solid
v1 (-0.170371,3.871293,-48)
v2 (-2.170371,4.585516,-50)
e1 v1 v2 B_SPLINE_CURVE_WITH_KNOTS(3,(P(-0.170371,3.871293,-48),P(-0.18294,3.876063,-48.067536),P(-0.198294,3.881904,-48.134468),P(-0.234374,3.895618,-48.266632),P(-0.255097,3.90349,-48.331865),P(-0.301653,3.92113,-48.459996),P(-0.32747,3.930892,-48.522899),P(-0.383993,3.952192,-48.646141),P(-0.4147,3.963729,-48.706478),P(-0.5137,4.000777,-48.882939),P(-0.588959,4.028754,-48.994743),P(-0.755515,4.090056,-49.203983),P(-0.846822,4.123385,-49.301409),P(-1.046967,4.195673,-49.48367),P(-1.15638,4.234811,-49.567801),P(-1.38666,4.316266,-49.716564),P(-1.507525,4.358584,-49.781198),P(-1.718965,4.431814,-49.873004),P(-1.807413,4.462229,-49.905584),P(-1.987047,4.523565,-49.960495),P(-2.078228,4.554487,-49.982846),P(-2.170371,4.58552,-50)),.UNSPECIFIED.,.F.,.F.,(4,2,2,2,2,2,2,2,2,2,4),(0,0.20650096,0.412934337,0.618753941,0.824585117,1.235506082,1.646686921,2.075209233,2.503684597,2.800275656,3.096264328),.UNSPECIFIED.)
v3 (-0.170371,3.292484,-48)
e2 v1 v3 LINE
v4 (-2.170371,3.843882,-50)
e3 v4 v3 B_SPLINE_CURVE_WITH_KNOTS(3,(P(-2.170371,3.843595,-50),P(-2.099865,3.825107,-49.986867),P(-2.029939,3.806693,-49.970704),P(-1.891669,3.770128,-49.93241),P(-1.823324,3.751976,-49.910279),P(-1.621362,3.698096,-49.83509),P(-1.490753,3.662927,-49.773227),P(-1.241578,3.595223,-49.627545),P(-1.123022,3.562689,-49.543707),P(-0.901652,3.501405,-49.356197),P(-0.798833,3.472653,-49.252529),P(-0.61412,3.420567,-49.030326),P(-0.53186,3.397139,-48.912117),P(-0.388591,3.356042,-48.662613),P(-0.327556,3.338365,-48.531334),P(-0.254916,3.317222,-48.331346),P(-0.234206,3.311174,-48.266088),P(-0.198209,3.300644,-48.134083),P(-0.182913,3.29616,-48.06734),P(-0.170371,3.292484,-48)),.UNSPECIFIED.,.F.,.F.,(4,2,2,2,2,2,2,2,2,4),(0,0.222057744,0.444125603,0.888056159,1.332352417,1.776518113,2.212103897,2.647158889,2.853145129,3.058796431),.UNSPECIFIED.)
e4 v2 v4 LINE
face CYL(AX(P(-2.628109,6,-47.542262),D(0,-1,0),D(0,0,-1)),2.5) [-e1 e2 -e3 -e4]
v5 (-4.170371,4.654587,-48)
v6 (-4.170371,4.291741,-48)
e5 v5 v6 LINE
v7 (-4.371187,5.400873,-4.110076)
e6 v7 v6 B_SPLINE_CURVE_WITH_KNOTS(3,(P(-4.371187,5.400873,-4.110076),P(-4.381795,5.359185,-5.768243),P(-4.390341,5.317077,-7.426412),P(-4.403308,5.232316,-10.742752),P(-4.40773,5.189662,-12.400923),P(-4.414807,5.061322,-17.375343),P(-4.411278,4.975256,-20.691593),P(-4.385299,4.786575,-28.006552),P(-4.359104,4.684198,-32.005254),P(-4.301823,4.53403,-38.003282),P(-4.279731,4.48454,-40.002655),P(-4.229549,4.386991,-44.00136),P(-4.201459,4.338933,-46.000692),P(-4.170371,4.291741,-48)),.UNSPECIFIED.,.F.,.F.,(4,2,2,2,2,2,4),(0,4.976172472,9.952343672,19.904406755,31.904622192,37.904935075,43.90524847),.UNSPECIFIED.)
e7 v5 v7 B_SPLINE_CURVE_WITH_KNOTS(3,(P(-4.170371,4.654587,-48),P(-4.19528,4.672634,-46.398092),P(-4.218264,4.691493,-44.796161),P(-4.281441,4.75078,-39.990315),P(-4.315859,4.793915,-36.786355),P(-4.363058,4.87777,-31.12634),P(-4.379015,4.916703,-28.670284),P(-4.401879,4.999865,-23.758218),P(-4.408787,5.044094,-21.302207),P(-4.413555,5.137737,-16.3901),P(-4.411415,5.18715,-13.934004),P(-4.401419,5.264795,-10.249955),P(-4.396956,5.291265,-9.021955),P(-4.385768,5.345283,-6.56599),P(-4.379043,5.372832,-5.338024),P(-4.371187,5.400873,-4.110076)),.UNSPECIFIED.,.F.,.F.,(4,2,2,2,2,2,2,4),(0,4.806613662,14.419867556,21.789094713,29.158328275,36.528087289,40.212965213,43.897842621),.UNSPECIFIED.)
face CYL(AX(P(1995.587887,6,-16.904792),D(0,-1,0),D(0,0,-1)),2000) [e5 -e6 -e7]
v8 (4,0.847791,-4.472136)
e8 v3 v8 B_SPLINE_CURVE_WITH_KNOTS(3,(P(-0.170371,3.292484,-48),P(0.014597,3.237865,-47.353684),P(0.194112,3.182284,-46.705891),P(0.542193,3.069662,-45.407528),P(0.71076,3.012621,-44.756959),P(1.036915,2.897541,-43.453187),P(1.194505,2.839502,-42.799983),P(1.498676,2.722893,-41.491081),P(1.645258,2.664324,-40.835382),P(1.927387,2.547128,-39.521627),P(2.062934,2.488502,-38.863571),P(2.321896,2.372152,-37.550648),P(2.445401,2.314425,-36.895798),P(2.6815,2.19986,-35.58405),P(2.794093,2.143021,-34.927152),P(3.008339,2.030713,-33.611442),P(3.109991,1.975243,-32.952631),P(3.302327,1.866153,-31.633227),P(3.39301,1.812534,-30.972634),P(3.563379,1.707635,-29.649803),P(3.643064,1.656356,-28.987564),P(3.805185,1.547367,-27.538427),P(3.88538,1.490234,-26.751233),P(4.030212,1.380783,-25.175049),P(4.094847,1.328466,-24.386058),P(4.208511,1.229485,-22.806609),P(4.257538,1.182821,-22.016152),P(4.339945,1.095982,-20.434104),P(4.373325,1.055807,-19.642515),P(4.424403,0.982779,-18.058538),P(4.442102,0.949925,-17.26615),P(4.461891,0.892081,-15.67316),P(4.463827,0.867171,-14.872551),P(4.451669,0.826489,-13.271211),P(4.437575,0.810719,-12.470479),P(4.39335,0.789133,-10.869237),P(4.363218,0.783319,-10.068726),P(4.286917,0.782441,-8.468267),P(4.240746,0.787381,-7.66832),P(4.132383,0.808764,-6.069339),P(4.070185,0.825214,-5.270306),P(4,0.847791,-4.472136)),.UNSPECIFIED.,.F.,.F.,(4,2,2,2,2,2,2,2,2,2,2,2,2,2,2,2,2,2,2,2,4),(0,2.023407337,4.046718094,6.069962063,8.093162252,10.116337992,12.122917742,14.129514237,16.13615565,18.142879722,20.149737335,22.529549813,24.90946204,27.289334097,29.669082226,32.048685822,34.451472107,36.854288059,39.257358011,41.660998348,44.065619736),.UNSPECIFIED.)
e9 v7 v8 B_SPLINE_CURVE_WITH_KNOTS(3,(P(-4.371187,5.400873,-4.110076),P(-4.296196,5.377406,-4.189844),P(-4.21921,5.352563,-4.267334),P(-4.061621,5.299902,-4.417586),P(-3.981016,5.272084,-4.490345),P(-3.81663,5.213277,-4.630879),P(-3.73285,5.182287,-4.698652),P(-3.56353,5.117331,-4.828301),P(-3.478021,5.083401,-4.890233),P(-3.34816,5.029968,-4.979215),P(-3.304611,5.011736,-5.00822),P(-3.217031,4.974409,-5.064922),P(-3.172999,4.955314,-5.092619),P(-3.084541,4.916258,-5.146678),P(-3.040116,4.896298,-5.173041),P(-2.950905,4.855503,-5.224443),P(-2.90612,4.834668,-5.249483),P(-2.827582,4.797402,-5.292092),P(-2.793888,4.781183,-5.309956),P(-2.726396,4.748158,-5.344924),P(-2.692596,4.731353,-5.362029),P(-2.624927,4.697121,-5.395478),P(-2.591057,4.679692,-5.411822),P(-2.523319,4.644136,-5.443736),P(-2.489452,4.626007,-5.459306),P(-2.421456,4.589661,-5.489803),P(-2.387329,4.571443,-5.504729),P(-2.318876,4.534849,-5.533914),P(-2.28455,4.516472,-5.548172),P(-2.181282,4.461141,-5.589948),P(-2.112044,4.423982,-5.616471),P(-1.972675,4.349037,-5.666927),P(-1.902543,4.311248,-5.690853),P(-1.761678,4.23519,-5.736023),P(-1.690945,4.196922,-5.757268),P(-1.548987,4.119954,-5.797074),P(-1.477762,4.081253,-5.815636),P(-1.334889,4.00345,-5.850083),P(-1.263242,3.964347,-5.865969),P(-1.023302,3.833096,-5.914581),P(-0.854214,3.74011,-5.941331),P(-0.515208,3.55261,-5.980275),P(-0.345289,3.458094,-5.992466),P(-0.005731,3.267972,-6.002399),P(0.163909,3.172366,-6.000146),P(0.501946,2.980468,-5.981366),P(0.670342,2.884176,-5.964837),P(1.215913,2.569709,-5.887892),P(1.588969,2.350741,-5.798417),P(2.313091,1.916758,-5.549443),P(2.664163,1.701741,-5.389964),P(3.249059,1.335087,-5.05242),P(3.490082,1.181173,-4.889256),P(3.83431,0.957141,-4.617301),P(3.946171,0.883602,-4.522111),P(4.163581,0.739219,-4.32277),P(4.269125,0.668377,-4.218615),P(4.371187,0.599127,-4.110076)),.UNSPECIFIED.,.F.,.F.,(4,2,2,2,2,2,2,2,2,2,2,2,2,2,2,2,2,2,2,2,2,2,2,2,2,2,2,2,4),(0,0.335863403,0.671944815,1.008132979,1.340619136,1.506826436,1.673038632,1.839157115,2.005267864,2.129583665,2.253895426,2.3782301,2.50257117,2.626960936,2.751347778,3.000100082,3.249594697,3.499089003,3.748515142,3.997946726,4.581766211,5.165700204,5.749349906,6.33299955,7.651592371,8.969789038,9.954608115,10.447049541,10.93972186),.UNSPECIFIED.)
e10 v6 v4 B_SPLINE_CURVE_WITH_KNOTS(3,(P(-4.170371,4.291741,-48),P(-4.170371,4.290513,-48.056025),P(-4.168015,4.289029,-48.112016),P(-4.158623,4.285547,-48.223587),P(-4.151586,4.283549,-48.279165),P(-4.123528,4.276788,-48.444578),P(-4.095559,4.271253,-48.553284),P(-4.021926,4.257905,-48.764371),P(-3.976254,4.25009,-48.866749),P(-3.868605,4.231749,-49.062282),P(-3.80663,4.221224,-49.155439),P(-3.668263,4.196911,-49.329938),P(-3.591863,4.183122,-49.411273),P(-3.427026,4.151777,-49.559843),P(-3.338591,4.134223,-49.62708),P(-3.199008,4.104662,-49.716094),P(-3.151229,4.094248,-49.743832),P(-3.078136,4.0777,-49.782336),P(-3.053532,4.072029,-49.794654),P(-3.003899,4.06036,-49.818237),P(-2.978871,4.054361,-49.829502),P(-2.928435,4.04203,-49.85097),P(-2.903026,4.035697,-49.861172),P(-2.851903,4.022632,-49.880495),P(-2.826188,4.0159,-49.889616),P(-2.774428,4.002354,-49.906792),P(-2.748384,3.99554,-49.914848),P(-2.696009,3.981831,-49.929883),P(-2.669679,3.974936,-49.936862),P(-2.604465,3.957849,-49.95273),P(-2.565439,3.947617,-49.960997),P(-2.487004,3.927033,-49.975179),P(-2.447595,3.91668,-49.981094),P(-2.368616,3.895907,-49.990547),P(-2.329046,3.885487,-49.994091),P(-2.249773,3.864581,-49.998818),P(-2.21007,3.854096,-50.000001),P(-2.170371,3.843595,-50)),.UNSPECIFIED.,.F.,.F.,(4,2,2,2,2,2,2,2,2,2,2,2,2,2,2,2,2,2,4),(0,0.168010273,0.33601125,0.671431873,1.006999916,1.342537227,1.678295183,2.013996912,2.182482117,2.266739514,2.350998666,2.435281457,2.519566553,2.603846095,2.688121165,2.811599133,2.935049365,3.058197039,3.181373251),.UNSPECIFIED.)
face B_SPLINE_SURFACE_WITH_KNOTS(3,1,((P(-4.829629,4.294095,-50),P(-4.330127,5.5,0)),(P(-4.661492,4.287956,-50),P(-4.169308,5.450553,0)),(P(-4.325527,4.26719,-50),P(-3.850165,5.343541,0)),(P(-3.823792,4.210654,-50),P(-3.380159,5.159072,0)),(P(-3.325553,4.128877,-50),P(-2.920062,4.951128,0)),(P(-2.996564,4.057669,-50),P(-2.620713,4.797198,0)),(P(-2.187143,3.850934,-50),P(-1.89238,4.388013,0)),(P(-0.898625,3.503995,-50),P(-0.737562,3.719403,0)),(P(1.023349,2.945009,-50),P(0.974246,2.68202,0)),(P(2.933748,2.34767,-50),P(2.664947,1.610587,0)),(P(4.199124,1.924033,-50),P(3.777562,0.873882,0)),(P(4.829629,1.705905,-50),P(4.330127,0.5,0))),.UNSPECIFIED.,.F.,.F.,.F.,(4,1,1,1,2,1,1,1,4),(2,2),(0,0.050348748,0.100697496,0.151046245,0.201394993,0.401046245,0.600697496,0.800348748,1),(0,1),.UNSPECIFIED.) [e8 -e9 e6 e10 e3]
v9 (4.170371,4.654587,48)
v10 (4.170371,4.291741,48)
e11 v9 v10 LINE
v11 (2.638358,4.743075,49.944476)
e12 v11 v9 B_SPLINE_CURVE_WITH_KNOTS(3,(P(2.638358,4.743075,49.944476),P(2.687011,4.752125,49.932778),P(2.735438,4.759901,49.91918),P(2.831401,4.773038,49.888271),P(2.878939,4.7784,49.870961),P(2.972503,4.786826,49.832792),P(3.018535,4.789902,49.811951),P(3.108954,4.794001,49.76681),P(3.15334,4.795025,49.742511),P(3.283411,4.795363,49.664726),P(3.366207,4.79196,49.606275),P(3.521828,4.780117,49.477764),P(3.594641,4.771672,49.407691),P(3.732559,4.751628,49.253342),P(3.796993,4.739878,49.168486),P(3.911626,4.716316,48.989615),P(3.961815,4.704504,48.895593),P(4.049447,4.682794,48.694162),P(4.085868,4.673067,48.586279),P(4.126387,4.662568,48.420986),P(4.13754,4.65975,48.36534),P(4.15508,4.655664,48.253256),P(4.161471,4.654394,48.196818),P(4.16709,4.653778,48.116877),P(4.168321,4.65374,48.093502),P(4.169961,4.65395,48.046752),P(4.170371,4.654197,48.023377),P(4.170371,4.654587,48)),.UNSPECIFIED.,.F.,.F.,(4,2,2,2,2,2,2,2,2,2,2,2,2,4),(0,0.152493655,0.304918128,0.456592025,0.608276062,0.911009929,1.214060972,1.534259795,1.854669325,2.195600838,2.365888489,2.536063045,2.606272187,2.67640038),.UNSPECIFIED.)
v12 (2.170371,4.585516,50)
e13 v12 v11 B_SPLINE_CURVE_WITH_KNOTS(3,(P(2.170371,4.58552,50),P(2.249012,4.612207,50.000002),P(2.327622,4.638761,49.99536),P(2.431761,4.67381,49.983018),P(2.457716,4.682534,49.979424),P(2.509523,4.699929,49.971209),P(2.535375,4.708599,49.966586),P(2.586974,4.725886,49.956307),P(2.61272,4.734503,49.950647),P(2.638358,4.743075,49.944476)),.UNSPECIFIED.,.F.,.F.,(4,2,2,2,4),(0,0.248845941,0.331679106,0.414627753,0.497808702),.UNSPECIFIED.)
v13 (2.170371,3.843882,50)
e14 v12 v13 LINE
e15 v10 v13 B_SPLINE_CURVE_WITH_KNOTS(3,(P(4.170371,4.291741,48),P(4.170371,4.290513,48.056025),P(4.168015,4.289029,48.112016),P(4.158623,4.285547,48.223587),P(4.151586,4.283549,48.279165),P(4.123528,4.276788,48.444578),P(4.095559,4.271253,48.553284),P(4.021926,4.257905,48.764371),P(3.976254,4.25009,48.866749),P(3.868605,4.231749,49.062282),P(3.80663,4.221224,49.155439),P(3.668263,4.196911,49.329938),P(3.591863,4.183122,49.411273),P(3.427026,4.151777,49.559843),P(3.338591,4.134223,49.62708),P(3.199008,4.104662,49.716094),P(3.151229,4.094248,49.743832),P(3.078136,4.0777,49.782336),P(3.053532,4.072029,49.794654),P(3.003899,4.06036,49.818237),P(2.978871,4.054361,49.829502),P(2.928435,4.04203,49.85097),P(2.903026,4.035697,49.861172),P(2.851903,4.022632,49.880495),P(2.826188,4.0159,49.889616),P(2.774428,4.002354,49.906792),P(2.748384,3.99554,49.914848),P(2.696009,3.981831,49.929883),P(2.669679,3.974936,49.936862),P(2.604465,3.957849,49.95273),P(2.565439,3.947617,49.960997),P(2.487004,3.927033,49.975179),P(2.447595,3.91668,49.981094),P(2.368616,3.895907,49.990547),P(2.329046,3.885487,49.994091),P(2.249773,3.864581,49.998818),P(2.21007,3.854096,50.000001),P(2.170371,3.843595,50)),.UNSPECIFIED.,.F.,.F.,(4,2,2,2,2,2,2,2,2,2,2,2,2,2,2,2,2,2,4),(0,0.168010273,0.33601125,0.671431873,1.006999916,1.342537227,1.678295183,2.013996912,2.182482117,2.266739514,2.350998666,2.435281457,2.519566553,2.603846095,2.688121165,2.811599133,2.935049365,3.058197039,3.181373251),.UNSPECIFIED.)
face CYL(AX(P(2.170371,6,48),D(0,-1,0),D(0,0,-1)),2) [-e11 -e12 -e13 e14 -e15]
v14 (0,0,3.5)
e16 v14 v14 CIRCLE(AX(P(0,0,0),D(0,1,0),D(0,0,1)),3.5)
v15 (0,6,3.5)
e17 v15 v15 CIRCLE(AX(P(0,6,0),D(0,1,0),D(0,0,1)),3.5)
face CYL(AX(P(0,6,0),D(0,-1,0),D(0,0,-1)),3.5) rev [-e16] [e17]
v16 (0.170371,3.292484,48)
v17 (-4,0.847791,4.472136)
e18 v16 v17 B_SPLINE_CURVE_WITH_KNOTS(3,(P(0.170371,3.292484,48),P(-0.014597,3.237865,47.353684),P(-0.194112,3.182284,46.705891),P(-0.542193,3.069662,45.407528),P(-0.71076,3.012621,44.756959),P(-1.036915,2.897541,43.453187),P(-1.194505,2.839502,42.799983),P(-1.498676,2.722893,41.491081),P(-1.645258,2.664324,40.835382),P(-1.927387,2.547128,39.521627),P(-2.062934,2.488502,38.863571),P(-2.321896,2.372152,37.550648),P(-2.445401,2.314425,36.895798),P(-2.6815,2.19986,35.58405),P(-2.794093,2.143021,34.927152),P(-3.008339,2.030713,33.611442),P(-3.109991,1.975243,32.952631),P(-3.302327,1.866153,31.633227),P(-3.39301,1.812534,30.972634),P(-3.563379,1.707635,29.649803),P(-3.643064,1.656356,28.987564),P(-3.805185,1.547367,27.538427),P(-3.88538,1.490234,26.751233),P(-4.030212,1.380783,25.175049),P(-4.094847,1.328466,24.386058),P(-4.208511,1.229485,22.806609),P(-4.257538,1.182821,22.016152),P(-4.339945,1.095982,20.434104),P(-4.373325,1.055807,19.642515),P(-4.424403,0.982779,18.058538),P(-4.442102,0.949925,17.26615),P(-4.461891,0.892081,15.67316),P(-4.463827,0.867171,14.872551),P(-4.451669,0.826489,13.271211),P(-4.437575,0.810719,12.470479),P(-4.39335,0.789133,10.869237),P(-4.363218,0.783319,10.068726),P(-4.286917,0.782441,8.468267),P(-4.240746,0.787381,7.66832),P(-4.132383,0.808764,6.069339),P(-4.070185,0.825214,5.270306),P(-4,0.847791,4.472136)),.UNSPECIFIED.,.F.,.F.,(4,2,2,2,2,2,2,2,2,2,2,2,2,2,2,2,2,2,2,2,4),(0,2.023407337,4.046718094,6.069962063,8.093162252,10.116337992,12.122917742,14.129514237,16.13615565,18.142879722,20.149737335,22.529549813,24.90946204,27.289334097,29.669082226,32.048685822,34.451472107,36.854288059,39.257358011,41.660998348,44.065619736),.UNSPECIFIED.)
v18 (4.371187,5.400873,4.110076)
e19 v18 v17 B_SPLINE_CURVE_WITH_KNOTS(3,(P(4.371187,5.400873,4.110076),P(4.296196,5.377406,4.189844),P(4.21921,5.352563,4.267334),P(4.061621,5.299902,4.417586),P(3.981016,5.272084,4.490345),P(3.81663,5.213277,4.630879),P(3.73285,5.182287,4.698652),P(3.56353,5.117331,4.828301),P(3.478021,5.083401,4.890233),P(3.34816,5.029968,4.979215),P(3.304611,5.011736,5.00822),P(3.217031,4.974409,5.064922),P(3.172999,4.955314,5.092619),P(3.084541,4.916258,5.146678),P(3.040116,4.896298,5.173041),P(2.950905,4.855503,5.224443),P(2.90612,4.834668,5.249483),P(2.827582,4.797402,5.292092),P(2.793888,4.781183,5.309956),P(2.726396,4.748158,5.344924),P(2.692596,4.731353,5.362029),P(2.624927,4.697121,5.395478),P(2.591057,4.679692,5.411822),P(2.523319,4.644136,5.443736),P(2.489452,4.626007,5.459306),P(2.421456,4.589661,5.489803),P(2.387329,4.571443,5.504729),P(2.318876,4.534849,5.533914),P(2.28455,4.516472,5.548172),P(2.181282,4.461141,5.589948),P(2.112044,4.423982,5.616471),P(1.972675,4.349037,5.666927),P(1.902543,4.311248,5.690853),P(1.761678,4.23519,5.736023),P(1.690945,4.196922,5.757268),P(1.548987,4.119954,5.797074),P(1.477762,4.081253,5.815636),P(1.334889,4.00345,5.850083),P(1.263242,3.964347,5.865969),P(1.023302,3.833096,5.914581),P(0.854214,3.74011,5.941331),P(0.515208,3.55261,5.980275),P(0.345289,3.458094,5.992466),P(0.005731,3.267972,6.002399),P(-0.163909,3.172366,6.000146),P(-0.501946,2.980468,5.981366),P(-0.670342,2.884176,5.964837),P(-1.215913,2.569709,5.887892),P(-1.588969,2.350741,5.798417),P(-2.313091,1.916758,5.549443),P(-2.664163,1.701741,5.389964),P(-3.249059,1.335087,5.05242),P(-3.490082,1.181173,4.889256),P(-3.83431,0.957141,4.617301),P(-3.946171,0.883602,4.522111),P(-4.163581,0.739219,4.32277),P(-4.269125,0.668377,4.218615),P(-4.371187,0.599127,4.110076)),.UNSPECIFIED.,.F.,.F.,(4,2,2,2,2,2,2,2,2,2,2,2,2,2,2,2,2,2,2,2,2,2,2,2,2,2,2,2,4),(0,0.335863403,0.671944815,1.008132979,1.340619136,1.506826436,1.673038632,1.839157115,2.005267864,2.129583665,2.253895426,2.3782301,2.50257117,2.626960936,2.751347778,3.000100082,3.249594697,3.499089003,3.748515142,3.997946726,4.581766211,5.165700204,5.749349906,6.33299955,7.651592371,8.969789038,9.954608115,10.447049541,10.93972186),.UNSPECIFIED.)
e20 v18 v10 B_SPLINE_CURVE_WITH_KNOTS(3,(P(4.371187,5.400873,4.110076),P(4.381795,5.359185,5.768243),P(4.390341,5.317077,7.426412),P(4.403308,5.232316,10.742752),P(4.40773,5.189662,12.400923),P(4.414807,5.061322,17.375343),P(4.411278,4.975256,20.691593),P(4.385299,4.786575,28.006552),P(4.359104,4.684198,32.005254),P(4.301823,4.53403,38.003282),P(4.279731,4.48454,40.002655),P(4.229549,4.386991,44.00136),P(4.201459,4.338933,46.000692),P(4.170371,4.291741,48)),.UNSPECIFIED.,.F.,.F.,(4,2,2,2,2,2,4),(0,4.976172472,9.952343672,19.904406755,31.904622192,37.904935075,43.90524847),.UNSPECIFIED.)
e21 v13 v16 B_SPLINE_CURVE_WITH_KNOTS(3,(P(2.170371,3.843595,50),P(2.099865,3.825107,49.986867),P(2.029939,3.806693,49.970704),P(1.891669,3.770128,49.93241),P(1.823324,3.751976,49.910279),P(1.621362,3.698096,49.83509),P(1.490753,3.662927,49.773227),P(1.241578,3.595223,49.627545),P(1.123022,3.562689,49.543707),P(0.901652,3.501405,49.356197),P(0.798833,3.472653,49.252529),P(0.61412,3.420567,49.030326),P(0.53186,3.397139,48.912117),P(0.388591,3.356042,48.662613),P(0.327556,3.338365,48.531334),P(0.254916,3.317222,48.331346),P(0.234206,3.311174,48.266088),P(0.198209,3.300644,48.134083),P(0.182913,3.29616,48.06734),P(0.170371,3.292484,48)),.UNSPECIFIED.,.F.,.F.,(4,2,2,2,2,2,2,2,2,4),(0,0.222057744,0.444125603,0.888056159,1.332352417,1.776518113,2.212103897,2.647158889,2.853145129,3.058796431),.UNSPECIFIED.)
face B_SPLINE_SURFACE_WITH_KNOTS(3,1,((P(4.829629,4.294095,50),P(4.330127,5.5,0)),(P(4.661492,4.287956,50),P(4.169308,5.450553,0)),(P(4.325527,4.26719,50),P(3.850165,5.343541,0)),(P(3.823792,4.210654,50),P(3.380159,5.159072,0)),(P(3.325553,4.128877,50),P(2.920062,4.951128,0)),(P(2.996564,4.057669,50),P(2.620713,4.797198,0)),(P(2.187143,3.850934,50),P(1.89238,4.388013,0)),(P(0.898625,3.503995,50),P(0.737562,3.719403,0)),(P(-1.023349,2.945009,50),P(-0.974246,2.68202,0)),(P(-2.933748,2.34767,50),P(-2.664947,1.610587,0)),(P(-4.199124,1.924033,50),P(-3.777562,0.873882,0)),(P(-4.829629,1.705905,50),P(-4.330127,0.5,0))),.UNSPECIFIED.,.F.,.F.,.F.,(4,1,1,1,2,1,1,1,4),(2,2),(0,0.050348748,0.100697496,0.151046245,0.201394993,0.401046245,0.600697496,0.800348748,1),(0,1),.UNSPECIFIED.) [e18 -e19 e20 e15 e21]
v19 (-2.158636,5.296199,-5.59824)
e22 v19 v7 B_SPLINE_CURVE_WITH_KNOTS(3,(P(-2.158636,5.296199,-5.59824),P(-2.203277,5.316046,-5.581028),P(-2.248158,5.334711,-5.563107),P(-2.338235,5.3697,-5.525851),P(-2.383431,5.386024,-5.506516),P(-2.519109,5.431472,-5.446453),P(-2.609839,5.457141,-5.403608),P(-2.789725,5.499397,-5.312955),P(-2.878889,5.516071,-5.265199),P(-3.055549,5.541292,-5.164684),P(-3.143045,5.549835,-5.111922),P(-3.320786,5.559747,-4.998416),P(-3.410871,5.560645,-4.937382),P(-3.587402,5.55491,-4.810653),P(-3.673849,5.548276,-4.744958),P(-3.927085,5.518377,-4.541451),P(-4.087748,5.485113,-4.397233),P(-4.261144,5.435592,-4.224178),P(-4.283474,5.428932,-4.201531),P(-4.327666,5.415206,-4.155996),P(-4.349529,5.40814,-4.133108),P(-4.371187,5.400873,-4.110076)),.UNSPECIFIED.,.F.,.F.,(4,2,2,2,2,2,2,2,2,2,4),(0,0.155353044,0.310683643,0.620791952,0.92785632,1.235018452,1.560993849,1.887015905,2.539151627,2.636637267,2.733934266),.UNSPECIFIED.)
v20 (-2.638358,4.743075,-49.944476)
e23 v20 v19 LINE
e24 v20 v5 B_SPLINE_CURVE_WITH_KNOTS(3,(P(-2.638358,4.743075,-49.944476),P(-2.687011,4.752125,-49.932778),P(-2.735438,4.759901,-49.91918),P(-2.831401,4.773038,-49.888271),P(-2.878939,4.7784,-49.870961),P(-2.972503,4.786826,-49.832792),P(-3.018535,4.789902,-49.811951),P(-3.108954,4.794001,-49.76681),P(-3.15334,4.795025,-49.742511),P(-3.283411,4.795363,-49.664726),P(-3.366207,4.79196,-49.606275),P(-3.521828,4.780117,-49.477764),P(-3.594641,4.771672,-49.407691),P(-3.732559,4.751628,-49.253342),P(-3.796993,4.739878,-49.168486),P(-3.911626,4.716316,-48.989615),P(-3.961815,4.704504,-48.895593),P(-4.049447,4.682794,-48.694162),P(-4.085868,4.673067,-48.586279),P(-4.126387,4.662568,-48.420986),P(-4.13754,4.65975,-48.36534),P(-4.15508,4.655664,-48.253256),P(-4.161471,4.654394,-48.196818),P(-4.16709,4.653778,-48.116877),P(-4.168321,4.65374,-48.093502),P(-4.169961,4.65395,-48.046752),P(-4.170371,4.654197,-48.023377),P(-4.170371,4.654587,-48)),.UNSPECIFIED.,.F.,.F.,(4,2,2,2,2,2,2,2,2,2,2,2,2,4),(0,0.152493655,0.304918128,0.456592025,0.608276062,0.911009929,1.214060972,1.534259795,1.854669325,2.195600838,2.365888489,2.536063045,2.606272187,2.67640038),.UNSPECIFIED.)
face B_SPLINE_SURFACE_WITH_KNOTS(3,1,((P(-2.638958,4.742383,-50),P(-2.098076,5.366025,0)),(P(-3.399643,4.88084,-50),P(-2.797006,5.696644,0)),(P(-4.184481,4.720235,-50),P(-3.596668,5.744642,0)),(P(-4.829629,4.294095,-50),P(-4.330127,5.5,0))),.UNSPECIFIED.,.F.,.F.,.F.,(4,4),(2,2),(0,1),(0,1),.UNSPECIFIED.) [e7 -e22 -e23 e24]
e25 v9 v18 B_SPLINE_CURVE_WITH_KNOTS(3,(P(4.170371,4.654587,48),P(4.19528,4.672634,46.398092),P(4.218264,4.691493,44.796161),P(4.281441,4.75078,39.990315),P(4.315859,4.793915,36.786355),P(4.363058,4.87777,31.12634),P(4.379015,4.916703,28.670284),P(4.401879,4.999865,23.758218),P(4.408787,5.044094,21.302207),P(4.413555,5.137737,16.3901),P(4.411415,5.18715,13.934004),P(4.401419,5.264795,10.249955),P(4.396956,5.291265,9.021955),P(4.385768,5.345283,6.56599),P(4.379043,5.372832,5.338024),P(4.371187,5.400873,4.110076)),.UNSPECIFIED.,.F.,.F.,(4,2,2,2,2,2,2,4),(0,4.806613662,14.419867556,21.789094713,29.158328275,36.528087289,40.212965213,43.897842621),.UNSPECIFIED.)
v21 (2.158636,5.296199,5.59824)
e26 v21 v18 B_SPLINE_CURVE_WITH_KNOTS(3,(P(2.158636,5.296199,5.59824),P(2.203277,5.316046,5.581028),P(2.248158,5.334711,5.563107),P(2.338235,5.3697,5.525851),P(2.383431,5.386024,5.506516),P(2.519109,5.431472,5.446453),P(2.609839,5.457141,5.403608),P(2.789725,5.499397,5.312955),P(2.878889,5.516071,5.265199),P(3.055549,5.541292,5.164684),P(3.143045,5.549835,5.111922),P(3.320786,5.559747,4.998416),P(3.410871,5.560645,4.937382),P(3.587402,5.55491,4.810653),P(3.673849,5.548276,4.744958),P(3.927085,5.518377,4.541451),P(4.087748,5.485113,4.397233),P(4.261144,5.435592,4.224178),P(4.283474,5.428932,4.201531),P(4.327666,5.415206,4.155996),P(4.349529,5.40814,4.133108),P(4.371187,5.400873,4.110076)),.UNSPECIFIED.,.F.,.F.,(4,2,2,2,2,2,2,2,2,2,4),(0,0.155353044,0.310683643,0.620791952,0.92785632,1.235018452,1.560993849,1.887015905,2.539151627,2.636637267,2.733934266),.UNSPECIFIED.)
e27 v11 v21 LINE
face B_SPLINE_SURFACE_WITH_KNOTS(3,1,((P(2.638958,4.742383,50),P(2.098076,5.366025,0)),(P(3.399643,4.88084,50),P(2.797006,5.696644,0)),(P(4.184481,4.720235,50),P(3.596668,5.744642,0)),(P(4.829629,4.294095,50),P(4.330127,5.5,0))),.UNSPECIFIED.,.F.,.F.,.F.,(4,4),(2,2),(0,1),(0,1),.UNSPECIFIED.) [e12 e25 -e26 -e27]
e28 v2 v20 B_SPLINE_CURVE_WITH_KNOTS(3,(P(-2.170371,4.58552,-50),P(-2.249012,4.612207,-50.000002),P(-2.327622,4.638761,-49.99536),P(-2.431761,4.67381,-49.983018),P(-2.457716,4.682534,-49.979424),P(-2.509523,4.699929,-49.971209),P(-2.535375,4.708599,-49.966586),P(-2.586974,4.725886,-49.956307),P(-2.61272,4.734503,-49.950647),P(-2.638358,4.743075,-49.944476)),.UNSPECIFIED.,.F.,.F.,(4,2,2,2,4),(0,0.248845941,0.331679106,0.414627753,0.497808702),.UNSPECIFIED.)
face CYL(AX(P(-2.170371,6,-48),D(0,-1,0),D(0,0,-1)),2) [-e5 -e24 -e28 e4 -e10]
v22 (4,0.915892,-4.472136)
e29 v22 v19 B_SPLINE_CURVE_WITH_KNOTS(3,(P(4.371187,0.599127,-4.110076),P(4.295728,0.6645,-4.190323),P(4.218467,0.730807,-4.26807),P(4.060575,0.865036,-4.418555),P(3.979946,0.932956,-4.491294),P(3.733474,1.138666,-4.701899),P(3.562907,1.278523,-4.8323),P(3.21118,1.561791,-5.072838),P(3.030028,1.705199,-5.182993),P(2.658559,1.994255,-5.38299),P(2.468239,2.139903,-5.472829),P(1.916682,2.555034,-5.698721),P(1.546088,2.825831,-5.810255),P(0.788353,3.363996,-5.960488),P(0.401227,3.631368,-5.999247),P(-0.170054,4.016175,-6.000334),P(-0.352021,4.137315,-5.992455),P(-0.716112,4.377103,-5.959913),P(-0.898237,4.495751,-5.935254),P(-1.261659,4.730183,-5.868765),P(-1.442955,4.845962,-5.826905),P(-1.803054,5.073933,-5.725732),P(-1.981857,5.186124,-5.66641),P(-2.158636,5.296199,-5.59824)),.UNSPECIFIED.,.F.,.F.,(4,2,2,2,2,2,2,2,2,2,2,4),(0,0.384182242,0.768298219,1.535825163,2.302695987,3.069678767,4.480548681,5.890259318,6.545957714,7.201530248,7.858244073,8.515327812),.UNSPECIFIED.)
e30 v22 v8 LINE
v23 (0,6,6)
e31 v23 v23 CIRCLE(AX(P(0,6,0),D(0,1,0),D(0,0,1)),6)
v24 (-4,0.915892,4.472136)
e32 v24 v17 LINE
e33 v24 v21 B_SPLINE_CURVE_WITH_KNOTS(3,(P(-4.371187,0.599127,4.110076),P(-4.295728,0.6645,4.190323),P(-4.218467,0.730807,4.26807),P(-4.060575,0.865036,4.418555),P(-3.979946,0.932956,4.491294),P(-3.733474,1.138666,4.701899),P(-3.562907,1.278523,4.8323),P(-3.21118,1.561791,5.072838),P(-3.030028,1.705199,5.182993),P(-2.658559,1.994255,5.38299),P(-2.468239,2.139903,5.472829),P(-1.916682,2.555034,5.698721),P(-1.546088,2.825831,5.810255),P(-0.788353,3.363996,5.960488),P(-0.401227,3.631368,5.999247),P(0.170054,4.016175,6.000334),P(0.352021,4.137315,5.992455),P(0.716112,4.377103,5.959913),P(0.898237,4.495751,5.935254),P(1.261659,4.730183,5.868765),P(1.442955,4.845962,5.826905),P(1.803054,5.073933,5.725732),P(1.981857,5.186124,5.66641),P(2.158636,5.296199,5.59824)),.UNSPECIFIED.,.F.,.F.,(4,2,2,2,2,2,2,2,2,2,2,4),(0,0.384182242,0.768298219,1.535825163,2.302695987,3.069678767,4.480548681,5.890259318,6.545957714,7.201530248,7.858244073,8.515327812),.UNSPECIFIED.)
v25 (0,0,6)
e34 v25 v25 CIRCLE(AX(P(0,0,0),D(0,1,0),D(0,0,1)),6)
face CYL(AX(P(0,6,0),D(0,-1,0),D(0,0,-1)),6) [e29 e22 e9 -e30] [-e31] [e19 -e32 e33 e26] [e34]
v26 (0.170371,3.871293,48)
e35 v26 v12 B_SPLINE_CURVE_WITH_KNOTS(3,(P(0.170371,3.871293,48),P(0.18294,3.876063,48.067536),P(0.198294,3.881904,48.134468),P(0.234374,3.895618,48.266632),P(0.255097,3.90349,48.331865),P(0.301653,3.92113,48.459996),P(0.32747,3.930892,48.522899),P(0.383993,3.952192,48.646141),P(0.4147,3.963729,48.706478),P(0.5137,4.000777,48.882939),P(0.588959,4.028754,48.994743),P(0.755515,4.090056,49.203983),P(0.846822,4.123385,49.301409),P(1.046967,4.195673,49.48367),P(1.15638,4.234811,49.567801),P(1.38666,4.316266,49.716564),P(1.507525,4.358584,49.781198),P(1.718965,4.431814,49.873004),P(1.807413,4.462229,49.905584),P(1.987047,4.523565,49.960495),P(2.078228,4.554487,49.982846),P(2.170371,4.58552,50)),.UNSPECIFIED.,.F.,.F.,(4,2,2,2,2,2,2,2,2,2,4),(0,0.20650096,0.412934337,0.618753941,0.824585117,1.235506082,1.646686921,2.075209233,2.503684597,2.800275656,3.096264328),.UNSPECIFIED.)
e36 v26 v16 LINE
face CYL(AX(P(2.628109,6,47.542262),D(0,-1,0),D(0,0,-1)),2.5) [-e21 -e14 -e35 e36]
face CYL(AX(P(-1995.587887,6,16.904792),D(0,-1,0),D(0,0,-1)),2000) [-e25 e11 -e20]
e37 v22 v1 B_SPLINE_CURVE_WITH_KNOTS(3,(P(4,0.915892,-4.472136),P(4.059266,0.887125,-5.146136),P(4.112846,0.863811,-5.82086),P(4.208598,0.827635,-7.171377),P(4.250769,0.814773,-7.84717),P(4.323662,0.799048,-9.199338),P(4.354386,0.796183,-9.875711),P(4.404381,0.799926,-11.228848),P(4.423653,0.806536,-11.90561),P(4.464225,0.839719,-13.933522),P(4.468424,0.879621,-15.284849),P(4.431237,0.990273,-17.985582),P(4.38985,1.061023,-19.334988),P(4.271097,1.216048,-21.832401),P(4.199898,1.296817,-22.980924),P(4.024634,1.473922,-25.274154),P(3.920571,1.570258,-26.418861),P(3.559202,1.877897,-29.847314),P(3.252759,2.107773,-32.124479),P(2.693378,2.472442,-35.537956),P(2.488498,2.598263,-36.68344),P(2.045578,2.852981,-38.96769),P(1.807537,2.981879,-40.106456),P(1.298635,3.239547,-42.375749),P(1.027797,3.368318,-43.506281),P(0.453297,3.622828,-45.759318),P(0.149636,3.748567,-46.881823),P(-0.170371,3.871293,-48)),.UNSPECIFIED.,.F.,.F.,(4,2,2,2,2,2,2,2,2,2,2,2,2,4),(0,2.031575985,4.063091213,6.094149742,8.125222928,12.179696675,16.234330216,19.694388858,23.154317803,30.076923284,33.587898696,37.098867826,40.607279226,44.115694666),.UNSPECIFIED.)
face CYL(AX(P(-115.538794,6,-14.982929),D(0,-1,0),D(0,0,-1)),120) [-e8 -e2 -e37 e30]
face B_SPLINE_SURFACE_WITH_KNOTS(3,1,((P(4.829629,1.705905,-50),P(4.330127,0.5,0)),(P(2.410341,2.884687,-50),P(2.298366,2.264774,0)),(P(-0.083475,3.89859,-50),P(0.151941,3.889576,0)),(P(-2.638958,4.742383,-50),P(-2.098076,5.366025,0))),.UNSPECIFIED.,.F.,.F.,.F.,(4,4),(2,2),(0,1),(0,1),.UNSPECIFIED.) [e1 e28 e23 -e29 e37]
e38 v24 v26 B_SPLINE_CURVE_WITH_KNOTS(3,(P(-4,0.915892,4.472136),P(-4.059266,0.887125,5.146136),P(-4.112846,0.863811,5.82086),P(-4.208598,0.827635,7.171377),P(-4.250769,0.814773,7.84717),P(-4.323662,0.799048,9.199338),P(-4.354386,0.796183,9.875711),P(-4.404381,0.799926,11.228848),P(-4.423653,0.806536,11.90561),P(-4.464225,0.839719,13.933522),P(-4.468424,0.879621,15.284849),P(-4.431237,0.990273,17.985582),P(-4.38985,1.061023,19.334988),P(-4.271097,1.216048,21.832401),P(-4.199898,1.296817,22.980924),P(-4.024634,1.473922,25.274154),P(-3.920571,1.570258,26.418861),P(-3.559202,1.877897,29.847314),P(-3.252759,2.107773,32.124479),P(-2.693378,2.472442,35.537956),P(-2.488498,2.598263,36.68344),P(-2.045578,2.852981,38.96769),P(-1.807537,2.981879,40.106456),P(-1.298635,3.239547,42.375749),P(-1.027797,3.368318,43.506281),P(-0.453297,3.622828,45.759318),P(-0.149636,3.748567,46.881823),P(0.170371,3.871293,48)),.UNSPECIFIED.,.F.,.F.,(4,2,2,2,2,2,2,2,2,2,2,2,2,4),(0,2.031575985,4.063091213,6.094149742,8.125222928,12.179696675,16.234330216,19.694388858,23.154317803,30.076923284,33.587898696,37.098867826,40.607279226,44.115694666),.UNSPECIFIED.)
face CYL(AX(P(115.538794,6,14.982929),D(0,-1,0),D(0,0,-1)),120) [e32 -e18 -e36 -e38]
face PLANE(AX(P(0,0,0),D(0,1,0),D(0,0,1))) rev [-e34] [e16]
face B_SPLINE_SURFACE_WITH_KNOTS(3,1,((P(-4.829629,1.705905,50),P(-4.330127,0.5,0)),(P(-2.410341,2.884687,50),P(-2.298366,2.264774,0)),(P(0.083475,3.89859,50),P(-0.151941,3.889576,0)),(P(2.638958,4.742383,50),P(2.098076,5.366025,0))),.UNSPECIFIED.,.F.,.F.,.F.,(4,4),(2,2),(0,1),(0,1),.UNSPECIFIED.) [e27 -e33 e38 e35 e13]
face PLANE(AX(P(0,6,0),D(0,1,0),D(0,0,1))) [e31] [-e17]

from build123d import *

# Parameters (mm, degrees)
SKETCH_1_R               = 6
SKETCH_1_R_2             = 3.5
EXTRUDE_1_DEPTH          = 6
CUT_EXTRUDE_1_DEPTH      = 51.714889455
PATTERN_CIRCULAR_1_COUNT = 2
SKETCH_6_R               = 3.500000001
CUT_EXTRUDE_2_DEPTH      = 51.714889443


with BuildPart() as part:
    # 草图1 → 凸台-拉伸1 (new body)
    with BuildSketch(Plane(origin=(0, 0, 0), x_dir=(1, 0, 0), z_dir=(0, 1, 0))):
        with Locations(Location((0, 0, 0), (0, 0, 270))):
            Circle(SKETCH_1_R)
        with Locations(Location((0, 0, 0), (0, 0, 270))):
            Circle(SKETCH_1_R_2, mode=Mode.SUBTRACT)
    extrude(amount=EXTRUDE_1_DEPTH)

    # 放样1: read off the stored shape, not the designer's step
    # 放样1: loft between two sections, ruled curve by curve
    loft_1_from = [
        Edge.make_bspline([(4.829629131, 4.294095226, 50), (4.661491838, 4.287956363, 50), (4.325526719, 4.26719033, 50), (3.823791731, 4.210654383, 50), (3.325552775, 4.128877425, 50), (2.996563694, 4.057669381, 50), (2.187142745, 3.850933665, 50), (0.89862524, 3.503994998, 50), (-1.023348969, 2.94500881, 50), (-2.933748014, 2.347669617, 50), (-4.199124361, 1.92403297, 50), (-4.829629131, 1.705904774, 50)], [0, 0, 0, 0, 0.050348748, 0.100697496, 0.151046245, 0.201394993, 0.201394993, 0.401046245, 0.600697496, 0.800348748, 1, 1, 1, 1], 3),
        Edge.make_bspline([(2.638958434, 4.742382962, 50), (3.399643135, 4.880839784, 50), (4.184480539, 4.72023464, 50), (4.829629131, 4.294095226, 50)], [0, 0, 0, 0, 1, 1, 1, 1], 3),
        Edge.make_bspline([(-4.829629131, 1.705904774, 50), (-2.410341267, 2.884687308, 50), (0.08347511, 3.898589732, 50), (2.638958434, 4.742382962, 50)], [0, 0, 0, 0, 1, 1, 1, 1], 3),
    ]
    loft_1_to = [
        Edge.make_bspline([(4.330127019, 5.5, 0), (4.16930772, 5.450553181, 0), (3.850164979, 5.343540561, 0), (3.380158776, 5.15907246, 0), (2.920062334, 4.951128253, 0), (2.620713283, 4.797197925, 0), (1.892379824, 4.388013, 0), (0.737561824, 3.719403112, 0), (-0.974246431, 2.682020387, 0), (-2.664947447, 1.610587376, 0), (-3.777561909, 0.873882301, 0), (-4.330127019, 0.5, 0)], [0, 0, 0, 0, 0.050348748, 0.100697496, 0.151046245, 0.201394993, 0.201394993, 0.401046245, 0.600697496, 0.800348748, 1, 1, 1, 1], 3),
        Edge.make_bspline([(2.098076211, 5.366025404, 0), (2.797005947, 5.696644113, 0), (3.596668336, 5.744642324, 0), (4.330127019, 5.5, 0)], [0, 0, 0, 0, 1, 1, 1, 1], 3),
        Edge.make_bspline([(-4.330127019, 0.5, 0), (-2.298365759, 2.264774268, 0), (-0.151941372, 3.889575977, 0), (2.098076211, 5.366025404, 0)], [0, 0, 0, 0, 1, 1, 1, 1], 3),
    ]
    loft_1 = Solid(Shell([*[Face.make_surface_from_curves(loft_1_from[k], loft_1_to[k]) for k in range(3)], Face(Wire(loft_1_from)), Face(Wire(loft_1_to))]))
    add(loft_1)

    # Loft 1 2: loft between two sections, ruled curve by curve
    loft_1_2_from = [
        Edge.make_bspline([(4.829629131, 4.294095226, 50), (4.661491838, 4.287956363, 50), (4.325526719, 4.26719033, 50), (3.823791731, 4.210654383, 50), (3.325552775, 4.128877425, 50), (2.996563694, 4.057669381, 50), (2.187142745, 3.850933665, 50), (0.89862524, 3.503994998, 50), (-1.023348969, 2.94500881, 50), (-2.933748014, 2.347669617, 50), (-4.199124361, 1.92403297, 50), (-4.829629131, 1.705904774, 50)], [0, 0, 0, 0, 0.050348748, 0.100697496, 0.151046245, 0.201394993, 0.201394993, 0.401046245, 0.600697496, 0.800348748, 1, 1, 1, 1], 3),
        Edge.make_bspline([(-4.829629131, 1.705904774, 50), (-2.410341267, 2.884687308, 50), (0.08347511, 3.898589732, 50), (2.638958434, 4.742382962, 50)], [0, 0, 0, 0, 1, 1, 1, 1], 3),
        Edge.make_bspline([(2.638958434, 4.742382962, 50), (3.399643135, 4.880839784, 50), (4.184480539, 4.72023464, 50), (4.829629131, 4.294095226, 50)], [0, 0, 0, 0, 1, 1, 1, 1], 3),
    ]
    loft_1_2_to = [
        Edge.make_bspline([(4.330127019, 5.5, 0), (4.16930772, 5.450553181, 0), (3.850164979, 5.343540561, 0), (3.380158776, 5.15907246, 0), (2.920062334, 4.951128253, 0), (2.620713283, 4.797197925, 0), (1.892379824, 4.388013, 0), (0.737561824, 3.719403112, 0), (-0.974246431, 2.682020387, 0), (-2.664947447, 1.610587376, 0), (-3.777561909, 0.873882301, 0), (-4.330127019, 0.5, 0)], [0, 0, 0, 0, 0.050348748, 0.100697496, 0.151046245, 0.201394993, 0.201394993, 0.401046245, 0.600697496, 0.800348748, 1, 1, 1, 1], 3),
        Edge.make_bspline([(-4.330127019, 0.5, 0), (-2.298365759, 2.264774268, 0), (-0.151941372, 3.889575977, 0), (2.098076211, 5.366025404, 0)], [0, 0, 0, 0, 1, 1, 1, 1], 3),
        Edge.make_bspline([(2.098076211, 5.366025404, 0), (2.797005947, 5.696644113, 0), (3.596668336, 5.744642324, 0), (4.330127019, 5.5, 0)], [0, 0, 0, 0, 1, 1, 1, 1], 3),
    ]
    loft_1_2 = Solid(Shell([*[Face.make_surface_from_curves(loft_1_2_from[k], loft_1_2_to[k]) for k in range(3)], Face(Wire(loft_1_2_from)), Face(Wire(loft_1_2_to))]))
    add(loft_1_2)

    # 草图5 → 切除-拉伸1 (cut, through all)
    with BuildSketch(Plane(origin=(0, 0, 0), x_dir=(1, 0, 0), z_dir=(0, 1, 0))):
        with BuildLine():
            Line((-4.371186853, -4.110076094), (-6.947319176, -4.110076094))
            Line((-6.947319176, -4.110076094), (-6.947319176, -57.52702734))
            Line((-6.947319176, -57.52702734), (10.303651078, -57.52702734))
            Line((10.303651078, -57.52702734), (10.303651078, -4.110076094))
            Line((10.303651078, -4.110076094), (4.371186853, -4.110076094))
            ThreePointArc((4.371186853, -4.110076094), (4.391179084, -26.055588932), (4.170370869, -48))
            ThreePointArc((4.170370869, -48), (3.584584431, -49.414213562), (2.170370869, -50))
            ThreePointArc((2.170370869, -50), (0.860341889, -49.310028979), (0.170370869, -48))
            ThreePointArc((0.170370869, -48), (-3.914204719, -26.427627996), (-4, -4.472135955))
            ThreePointArc((-4, -4.472135955), (-4.189506435, -4.295117674), (-4.371186853, -4.110076094))
        make_face()
    cut_extrude_1 = extrude(amount=CUT_EXTRUDE_1_DEPTH, mode=Mode.SUBTRACT)

    # 阵列(圆周)1: 放样1, Loft 1 2, 切除-拉伸1 ×2 about axis
    pattern_circular_1_axis = Axis((0, 6, 0), (0, -1, 0))
    add([loft_1.rotate(pattern_circular_1_axis, i * 360 / PATTERN_CIRCULAR_1_COUNT) for i in range(1, PATTERN_CIRCULAR_1_COUNT)])
    add([loft_1_2.rotate(pattern_circular_1_axis, i * 360 / PATTERN_CIRCULAR_1_COUNT) for i in range(1, PATTERN_CIRCULAR_1_COUNT)])
    add([cut_extrude_1.rotate(pattern_circular_1_axis, i * 360 / PATTERN_CIRCULAR_1_COUNT) for i in range(1, PATTERN_CIRCULAR_1_COUNT)], mode=Mode.SUBTRACT)

    # 草图6 → 切除-拉伸2 (cut, through all)
    with BuildSketch(Plane(origin=(0, 6, 0), x_dir=(1, 0, 0), z_dir=(0, 1, 0))):
        with Locations(Location((1e-09, 0, 0), (0, 0, 269.999999987))):
            Circle(SKETCH_6_R)
    extrude(amount=-CUT_EXTRUDE_2_DEPTH, mode=Mode.SUBTRACT)


solid = part.part
